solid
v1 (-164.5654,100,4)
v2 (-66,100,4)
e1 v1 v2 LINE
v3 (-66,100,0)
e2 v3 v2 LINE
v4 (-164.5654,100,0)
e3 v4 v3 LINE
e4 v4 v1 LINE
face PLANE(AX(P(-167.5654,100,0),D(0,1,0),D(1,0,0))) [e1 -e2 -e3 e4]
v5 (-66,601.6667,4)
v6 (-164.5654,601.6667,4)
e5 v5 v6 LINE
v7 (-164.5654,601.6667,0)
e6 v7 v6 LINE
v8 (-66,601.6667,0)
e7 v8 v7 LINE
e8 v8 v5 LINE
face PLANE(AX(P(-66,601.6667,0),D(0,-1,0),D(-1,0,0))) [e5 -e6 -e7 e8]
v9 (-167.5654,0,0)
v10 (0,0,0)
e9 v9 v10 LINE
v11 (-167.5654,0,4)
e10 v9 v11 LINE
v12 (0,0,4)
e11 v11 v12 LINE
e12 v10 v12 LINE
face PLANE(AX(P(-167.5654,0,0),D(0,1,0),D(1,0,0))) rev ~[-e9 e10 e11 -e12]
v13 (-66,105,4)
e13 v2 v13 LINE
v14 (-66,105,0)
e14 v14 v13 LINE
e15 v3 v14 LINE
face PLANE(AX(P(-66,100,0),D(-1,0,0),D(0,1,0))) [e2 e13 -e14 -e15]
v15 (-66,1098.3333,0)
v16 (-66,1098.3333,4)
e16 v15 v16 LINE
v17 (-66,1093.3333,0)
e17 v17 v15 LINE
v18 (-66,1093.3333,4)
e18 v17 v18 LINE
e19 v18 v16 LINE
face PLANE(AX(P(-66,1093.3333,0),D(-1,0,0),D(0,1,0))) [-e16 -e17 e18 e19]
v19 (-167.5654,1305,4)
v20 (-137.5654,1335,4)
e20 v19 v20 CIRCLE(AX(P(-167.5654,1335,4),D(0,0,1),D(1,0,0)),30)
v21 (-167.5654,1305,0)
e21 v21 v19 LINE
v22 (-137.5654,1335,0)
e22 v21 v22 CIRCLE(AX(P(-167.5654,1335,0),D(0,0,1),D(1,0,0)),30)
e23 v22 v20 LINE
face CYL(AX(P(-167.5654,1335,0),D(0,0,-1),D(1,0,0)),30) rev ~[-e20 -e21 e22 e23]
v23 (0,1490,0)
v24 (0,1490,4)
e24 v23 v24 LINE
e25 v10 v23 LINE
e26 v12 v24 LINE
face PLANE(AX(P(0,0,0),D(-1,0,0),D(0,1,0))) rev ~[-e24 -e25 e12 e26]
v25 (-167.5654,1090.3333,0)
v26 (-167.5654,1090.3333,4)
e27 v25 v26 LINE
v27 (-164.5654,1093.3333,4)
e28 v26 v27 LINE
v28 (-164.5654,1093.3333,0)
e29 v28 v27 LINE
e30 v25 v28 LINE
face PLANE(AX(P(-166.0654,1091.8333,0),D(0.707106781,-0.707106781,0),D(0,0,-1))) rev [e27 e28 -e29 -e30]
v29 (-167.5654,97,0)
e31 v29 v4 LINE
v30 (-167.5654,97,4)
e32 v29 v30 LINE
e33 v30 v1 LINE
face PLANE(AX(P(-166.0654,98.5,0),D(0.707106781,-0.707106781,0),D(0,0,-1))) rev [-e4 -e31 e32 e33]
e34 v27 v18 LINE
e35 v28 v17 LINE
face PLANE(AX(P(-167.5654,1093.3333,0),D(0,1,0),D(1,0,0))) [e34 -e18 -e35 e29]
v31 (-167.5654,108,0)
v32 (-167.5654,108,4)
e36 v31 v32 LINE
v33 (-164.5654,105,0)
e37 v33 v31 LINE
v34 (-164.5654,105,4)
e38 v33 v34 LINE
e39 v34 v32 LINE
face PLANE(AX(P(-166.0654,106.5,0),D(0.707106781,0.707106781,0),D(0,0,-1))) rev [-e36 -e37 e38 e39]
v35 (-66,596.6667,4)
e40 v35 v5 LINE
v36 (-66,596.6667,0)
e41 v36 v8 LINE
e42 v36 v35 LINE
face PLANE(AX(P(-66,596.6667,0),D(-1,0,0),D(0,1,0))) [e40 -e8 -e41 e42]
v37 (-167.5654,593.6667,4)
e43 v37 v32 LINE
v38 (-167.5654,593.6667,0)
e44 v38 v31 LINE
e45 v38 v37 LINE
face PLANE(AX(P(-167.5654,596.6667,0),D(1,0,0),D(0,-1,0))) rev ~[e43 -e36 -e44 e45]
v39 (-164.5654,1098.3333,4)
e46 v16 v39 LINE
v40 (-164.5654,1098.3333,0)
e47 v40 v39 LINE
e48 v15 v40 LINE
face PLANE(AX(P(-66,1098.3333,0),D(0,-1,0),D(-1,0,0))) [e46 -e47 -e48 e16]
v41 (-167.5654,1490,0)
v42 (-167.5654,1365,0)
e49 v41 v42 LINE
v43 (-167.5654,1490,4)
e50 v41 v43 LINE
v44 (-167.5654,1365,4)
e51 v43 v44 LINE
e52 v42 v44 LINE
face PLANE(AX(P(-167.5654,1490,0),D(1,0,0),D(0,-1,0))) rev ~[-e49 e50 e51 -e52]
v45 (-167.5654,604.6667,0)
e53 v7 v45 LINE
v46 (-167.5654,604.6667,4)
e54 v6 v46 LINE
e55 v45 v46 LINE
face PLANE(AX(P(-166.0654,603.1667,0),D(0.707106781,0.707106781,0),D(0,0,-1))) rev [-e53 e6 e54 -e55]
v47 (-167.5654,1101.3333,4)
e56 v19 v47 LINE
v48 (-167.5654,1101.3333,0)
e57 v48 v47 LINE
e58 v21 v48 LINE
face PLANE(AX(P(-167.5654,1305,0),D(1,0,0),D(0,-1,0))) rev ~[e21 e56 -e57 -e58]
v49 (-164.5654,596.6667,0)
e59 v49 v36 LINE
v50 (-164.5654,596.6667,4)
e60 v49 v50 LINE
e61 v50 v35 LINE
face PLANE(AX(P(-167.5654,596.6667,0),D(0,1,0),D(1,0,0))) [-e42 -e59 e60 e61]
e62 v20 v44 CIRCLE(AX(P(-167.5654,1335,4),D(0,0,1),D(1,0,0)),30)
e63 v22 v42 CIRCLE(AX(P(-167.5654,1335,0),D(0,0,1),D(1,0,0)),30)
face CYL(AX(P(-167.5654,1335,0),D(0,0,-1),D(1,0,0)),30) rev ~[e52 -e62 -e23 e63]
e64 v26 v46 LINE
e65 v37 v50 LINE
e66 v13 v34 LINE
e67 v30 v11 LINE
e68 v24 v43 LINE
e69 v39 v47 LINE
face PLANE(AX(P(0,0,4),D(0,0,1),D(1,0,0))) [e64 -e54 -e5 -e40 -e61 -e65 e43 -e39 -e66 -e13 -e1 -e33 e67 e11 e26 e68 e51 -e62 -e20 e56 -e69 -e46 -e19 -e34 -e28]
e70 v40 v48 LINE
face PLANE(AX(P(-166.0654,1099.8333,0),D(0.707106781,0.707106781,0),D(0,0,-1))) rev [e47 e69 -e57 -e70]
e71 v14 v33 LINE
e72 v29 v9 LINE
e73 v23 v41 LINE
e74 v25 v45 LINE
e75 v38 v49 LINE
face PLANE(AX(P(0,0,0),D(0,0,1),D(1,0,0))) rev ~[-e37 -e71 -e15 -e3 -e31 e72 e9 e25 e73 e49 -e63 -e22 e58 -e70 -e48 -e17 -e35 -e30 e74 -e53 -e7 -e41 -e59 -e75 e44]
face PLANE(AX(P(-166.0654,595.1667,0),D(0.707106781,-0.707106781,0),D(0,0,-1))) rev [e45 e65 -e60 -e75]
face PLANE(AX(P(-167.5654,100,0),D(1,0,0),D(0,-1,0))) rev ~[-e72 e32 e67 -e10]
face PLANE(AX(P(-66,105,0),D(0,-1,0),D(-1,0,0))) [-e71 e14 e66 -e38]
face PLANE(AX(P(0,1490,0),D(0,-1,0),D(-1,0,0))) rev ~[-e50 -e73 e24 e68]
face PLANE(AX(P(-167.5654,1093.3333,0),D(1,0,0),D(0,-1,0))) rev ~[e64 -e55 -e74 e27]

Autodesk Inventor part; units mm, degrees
ref_plane "YZ Plane" through (0, 0, 0) normal (1, 0, 0) x (0, 1, 0)
ref_plane "XZ Plane" through (0, 0, 0) normal (0, 1, 0) x (-1, 0, 0)
ref_plane "XY Plane" through (0, 0, 0) normal (0, 0, 1) x (1, 0, 0)
sketch "Sketch1" plane through (0, 0, 0) normal (0, 0, 1) x (1, 0, 0)
  line L0 (0, 1490) -> (-167.5654, 1490)
  line L1 (-167.5654, 1490) -> (-167.5654, 0)
  line L2 (-167.5654, 0) -> (0, 0)
  line L3 (0, 0) -> (0, 1490)
  line L4 (-167.5654, 100) -> (-66, 100)
  line L5 (-66, 100) -> (-66, 105)
  line L6 (-66, 105) -> (-167.5654, 105)
  line L7 (-167.5654, 105) -> (-167.5654, 100)
  line L8 (-167.5654, 596.6667) -> (-66, 596.6667)
  line L9 (-66, 596.6667) -> (-66, 601.6667)
  line L10 (-66, 601.6667) -> (-167.5654, 601.6667)
  line L11 (-167.5654, 601.6667) -> (-167.5654, 596.6667)
  line L12 (-167.5654, 1093.3333) -> (-66, 1093.3333)
  line L13 (-66, 1093.3333) -> (-66, 1098.3333)
  line L14 (-66, 1098.3333) -> (-167.5654, 1098.3333)
  line L15 (-167.5654, 1098.3333) -> (-167.5654, 1093.3333)
  circle A0 centre (-167.5654, 1335) radius 30
  point P0 (-167.5654, 1098.3333)
  point P1 (-167.5654, 1093.3333)
  point P2 (-167.5654, 596.6667)
  point P3 (-167.5654, 1365)
  point P4 (-167.5654, 1305)
  dimension "d0" = 1490
  dimension "d1" = 167.5654
  dimension "d2" = 5
  dimension "d4" = 100
  dimension "d7" = 496.6667
  dimension "d23" = 66
  dimension "d29" = 60
  dimension "d30" = 1335
extrude "Plate1" add sketch "Sketch1" along normal blind 4 contours L3 L2 L1 L4 L5 L6 L8 L9 L10 L12 L13 L14 A0 L0
chamfer "Corner Chamfer1" distance 3 angle 45 6 edges at (-167.5654, 100, 2) (-167.5654, 105, 2) (-167.5654, 596.6667, 2) (-167.5654, 601.6667, 2) (-167.5654, 1098.3333, 2) (-167.5654, 1093.3333, 2)
equation "\"d0\" = Стрингер_длина"
equation "\"d1\" = стрингер_глубина_3"
equation "\"d2\" = паз_под_стрингер_толщина"
equation "\"d7\" = Шаг_шпангоутов"
equation "\"d23\" = паз_под_стрингер_глубина - Thickness"
equation "\"d29\" = 2 * радиус_выреза_под_сварку"
equation "\"d12\" = Thickness"
equation "\"BendRadius\" = Thickness"
equation "\"BendReliefWidth\" = Thickness"
equation "\"BendReliefDepth\" = 0.5 * Thickness"
equation "\"CornerReliefSize\" = 4 * Thickness"
equation "\"MinimumRemnant\" = 2 * Thickness"
equation "\"TransitionRadius\" = BendRadius"
equation "\"JacobiRadiusSize\" = BendRadius"
equation "\"GapSize\" = Thickness"
equation "\"Стрингер_длина\" = 1490"
equation "\"стрингер_глубина_3\" = 167.565356"
equation "\"паз_под_стрингер_толщина\" = 5"
equation "\"Шаг_шпангоутов\" = 496.666667"
equation "\"паз_под_стрингер_глубина\" = 70"
equation "\"Thickness\" = 4"
equation "\"радиус_выреза_под_сварку\" = 30"
properties part number "0415 GBK stringer C3" material "Steel"
